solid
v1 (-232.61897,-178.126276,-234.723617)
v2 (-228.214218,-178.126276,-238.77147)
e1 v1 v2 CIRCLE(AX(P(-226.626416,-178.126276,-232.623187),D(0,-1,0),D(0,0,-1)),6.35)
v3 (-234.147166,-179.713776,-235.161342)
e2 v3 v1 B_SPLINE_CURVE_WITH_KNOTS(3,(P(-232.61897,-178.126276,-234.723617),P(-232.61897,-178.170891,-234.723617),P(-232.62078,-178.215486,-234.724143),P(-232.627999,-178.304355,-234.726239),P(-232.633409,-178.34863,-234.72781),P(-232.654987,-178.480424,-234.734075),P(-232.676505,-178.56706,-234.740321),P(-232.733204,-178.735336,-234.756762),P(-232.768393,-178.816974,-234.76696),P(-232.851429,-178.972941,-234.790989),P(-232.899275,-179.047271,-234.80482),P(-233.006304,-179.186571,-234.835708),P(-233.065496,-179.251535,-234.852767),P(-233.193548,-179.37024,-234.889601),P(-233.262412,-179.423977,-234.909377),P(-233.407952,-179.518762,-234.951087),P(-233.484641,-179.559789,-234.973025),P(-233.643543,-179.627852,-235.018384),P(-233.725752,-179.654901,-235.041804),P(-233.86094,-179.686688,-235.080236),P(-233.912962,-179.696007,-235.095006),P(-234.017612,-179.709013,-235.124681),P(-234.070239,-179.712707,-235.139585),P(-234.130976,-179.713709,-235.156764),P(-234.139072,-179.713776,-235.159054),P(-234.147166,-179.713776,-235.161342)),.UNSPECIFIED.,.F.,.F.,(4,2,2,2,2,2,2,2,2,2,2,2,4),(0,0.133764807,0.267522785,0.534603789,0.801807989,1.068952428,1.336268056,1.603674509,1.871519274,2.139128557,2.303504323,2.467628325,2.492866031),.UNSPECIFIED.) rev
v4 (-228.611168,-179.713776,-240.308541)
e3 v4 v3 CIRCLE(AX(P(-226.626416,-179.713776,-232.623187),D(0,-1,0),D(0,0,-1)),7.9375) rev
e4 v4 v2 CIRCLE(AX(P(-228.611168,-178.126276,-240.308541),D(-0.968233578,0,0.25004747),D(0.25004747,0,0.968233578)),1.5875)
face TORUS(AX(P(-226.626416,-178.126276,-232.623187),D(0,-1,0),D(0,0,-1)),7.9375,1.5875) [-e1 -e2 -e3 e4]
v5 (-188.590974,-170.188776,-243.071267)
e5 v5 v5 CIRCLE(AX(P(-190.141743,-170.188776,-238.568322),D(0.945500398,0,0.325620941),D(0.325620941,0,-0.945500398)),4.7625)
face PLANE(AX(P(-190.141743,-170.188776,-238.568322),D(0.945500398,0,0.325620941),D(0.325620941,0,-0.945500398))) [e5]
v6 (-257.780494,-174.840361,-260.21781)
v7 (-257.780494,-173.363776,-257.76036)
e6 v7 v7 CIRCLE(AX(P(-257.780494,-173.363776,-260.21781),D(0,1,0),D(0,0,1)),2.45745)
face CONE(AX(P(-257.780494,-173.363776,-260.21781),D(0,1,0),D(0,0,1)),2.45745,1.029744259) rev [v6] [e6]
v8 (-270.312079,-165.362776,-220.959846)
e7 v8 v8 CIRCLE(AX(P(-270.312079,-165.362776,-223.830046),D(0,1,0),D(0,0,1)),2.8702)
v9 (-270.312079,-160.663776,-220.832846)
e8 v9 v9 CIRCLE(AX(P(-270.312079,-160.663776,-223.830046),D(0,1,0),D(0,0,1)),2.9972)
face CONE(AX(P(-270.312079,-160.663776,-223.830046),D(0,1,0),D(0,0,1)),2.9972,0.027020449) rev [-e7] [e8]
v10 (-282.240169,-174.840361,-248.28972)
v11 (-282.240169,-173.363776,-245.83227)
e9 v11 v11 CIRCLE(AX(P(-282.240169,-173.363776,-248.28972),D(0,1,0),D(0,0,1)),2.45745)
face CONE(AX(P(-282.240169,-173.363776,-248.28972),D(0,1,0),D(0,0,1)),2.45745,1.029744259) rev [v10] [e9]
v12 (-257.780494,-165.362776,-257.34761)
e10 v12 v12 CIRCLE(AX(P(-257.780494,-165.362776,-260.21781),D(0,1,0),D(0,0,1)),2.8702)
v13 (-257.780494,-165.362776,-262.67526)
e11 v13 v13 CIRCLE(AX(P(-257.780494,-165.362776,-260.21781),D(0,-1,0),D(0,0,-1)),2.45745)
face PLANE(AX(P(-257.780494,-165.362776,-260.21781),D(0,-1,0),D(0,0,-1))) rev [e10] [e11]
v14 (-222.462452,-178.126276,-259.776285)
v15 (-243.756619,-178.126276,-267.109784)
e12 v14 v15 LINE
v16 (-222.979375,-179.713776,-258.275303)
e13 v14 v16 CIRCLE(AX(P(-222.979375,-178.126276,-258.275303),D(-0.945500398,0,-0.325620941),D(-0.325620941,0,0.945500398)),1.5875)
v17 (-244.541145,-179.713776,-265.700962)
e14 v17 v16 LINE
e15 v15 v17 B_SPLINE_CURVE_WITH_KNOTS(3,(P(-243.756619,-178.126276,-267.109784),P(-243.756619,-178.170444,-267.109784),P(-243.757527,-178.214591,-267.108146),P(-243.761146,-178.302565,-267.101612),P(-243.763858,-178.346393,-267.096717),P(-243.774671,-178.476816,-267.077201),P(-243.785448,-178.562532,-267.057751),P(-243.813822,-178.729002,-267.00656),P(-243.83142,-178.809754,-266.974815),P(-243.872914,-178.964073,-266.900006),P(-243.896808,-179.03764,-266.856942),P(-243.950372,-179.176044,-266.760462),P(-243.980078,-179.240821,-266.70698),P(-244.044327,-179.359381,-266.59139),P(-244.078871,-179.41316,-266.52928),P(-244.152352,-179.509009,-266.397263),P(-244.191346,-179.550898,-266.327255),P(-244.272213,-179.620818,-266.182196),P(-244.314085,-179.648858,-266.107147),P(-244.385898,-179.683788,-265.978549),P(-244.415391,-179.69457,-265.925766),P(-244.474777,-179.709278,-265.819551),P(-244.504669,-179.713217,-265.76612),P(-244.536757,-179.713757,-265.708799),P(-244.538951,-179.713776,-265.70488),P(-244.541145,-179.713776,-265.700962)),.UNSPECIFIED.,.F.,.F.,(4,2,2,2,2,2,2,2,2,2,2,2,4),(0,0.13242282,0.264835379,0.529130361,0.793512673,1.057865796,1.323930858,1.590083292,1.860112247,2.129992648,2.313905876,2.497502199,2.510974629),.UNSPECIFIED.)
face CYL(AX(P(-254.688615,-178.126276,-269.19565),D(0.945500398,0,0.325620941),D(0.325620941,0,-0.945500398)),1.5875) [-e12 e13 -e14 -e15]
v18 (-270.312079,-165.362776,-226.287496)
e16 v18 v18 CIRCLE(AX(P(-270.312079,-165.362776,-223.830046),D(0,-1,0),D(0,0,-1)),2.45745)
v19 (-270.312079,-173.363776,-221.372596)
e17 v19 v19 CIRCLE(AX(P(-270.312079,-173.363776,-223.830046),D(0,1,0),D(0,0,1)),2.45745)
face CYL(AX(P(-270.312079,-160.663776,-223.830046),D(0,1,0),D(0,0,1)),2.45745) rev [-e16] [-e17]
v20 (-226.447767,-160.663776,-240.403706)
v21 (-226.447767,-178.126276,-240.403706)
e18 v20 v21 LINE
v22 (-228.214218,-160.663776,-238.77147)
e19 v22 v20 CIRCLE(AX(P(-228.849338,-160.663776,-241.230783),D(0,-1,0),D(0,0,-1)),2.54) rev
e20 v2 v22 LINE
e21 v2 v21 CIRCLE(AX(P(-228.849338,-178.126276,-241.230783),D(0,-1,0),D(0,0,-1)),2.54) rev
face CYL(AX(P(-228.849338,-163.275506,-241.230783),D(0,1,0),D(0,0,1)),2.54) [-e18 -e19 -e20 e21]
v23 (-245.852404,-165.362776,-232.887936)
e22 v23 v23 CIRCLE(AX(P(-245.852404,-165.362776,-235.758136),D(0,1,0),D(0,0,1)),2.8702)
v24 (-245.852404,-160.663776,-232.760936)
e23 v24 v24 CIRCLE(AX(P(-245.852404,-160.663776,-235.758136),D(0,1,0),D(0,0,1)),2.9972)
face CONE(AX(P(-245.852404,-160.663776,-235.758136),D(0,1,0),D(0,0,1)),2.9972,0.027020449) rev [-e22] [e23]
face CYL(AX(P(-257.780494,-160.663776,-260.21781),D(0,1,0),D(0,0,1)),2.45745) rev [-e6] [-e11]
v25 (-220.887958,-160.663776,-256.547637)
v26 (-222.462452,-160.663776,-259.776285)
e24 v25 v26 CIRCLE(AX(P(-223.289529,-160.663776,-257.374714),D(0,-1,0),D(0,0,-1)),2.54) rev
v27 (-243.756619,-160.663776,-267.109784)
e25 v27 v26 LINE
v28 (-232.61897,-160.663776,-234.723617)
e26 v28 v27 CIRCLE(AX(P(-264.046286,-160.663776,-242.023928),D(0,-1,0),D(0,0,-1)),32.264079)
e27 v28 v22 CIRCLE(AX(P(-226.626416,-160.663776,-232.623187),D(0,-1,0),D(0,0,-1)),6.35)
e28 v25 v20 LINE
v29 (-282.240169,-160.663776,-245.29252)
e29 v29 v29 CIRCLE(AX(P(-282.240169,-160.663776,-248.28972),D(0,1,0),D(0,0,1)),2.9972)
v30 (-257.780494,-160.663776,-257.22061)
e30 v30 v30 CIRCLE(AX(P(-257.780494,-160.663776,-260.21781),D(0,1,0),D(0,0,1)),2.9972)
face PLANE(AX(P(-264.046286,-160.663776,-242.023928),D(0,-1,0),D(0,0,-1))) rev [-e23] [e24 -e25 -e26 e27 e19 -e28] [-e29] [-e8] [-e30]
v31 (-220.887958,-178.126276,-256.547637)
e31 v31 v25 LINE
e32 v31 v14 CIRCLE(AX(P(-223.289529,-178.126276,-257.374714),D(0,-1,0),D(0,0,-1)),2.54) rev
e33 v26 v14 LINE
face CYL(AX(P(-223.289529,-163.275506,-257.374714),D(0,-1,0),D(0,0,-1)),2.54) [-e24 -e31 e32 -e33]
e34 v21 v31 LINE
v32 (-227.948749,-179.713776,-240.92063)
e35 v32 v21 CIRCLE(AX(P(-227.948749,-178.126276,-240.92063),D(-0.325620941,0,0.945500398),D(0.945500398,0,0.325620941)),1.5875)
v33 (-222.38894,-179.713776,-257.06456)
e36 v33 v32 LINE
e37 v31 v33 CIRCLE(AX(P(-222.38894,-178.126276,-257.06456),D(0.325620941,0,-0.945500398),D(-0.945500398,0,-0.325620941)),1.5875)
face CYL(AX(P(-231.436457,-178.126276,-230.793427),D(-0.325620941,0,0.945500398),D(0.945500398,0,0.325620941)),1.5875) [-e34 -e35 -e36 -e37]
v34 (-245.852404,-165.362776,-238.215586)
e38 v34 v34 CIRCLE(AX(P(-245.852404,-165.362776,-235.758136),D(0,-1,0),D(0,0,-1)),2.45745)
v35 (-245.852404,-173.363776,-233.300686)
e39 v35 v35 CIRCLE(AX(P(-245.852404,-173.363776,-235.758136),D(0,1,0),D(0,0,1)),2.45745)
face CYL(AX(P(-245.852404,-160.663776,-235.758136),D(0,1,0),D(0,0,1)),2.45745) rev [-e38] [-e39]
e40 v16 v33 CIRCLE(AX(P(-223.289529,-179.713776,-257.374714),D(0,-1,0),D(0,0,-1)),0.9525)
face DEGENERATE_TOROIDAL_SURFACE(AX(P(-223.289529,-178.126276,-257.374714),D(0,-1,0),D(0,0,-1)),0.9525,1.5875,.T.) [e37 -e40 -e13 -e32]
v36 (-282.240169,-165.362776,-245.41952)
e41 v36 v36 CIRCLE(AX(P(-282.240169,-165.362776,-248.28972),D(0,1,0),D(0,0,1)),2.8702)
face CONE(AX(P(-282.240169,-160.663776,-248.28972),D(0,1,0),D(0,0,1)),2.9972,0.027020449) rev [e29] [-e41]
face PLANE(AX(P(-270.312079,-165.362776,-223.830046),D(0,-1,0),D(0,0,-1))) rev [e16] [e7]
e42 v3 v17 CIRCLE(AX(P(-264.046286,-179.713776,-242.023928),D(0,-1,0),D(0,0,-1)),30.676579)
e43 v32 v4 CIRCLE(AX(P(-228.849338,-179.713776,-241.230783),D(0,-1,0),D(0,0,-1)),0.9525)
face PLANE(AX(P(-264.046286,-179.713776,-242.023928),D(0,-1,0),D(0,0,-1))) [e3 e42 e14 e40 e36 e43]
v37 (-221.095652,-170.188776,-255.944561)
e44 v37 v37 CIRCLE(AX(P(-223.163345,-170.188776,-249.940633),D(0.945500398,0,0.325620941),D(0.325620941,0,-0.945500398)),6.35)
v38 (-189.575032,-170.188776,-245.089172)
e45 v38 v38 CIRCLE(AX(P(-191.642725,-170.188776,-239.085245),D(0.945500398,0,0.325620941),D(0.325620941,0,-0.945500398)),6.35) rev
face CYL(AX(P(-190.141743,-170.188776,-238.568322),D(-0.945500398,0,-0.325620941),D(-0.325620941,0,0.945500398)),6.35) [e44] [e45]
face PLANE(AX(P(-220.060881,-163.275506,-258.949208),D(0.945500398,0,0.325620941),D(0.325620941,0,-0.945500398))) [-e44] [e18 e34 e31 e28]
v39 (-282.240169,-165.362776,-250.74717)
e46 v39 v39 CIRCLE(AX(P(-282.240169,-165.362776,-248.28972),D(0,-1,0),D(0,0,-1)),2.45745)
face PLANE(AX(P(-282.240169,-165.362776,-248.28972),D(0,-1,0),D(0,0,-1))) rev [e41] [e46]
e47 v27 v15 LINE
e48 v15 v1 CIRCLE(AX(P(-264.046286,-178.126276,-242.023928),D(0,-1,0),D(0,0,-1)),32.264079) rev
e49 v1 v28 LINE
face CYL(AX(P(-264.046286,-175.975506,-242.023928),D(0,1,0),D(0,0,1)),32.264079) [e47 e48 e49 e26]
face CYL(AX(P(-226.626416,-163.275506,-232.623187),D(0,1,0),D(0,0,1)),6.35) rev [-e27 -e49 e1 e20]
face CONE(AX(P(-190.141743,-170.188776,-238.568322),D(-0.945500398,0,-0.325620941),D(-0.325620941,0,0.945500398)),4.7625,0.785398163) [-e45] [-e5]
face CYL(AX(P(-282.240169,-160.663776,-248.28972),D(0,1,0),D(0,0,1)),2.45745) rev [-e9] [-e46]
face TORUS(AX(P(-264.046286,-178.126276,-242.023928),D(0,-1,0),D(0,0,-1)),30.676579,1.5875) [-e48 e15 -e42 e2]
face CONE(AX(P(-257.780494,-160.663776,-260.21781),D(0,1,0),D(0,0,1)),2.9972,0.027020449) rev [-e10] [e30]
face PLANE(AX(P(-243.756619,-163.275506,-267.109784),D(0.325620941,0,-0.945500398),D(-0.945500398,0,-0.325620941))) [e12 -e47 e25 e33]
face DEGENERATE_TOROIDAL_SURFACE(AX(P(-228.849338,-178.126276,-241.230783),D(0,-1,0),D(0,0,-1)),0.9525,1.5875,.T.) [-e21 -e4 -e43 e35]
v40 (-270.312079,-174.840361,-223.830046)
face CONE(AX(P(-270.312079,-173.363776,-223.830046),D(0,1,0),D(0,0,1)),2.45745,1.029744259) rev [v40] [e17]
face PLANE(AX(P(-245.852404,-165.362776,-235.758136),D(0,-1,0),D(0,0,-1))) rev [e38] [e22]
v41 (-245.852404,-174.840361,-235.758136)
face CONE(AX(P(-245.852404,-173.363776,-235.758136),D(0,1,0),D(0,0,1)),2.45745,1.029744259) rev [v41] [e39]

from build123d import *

# Parameters (mm, degrees)
STOCK_REFERENCE_START            = -175.975505736
STOCK_REFERENCE_SEAT_1_OUTLINE_R = 32.264078684
STOCK_REFERENCE_SEAT_1_DEPTH     = 15.311729992
STOCK_REFERENCE_SEAT_1_2_DEPTH   = 12.7
BOSS_EXTRUDE3_START              = 3.738270008
BOSS_EXTRUDE3_DEPTH              = 3.738270008
BOSS_EXTRUDE1_DEPTH              = 2.611729992
SKETCH2_R                        = 6.35
BOSS_EXTRUDE2_DEPTH              = 34.925
CHAMFER1_SIZE                    = 1.5875
FILLET1_R                        = 6.35
FILLET2_R                        = 2.54
FILLET3_R                        = 1.5875
HOLE1_AT_2_COUNT                 = 2
HOLE1_AT_2_PITCH                 = 27.213140303
HOLE1_AT_3_COUNT                 = 2
HOLE1_AT_3_PITCH                 = 38.485192091
HOLE1_AT_4_COUNT                 = 2
HOLE1_AT_4_PITCH                 = 27.213140303
F_8_CLEARANCE_HOLE1_D            = 4.9149
F_8_CLEARANCE_HOLE1_DEPTH        = 12.7
F_8_CLEARANCE_HOLE1_TIP          = 1.476584928


# Read off the part's stored shape, not the designer's step: Stock-Reference Seat-1
with BuildPart() as part:
    # Stock-Reference Seat-1 outline → Stock-Reference Seat-1 (new body)
    with BuildSketch(Plane(origin=(0, 0, 0), x_dir=(1, 0, 0), z_dir=(0, 1, 0)).offset(STOCK_REFERENCE_START)):
        with Locations((-264.046286299, 242.023928087)):
            Circle(STOCK_REFERENCE_SEAT_1_OUTLINE_R)
    extrude(amount=STOCK_REFERENCE_SEAT_1_DEPTH)

    # Stock-Reference Seat-1 2 outline → Stock-Reference Seat-1 2 (add)
    with BuildSketch(Plane(origin=(0, 0, 0), x_dir=(1, 0, 0), z_dir=(0, 1, 0)).offset(STOCK_REFERENCE_START)):
        with BuildLine():
            ThreePointArc((-243.756619182, 267.109784294), (-233.536149053, 252.516892329), (-232.618762484, 234.724508918))
            Line((-232.618762484, 234.724508918), (-230.711355396, 240.263016846))
            Line((-230.711355396, 240.263016846), (-226.943146121, 238.965283021))
            Line((-226.943146121, 238.965283021), (-220.060881103, 258.949207593))
            Line((-220.060881103, 258.949207593), (-243.756619182, 267.109784294))
        make_face()
    extrude(amount=STOCK_REFERENCE_SEAT_1_2_DEPTH)

    # Sketch7 → Boss-Extrude3 (add)
    with BuildSketch(Plane.XZ.offset(175.975505736).offset(BOSS_EXTRUDE3_START)):
        with BuildLine():
            Line((-243.756619182, -267.109784294), (-220.060881103, -258.949207593))
            Line((-220.060881103, -258.949207593), (-226.943146121, -238.965283021))
            Line((-226.943146121, -238.965283021), (-230.711355396, -240.263016846))
            Line((-230.711355396, -240.263016846), (-232.618762484, -234.724508918))
            ThreePointArc((-232.618762484, -234.724508918), (-294.556423545, -231.530963846), (-243.756619182, -267.109784294))
        make_face()
    extrude(amount=-BOSS_EXTRUDE3_DEPTH)

    # Sketch1 → Boss-Extrude1 (add)
    with BuildSketch(Plane(origin=(0, -163.275505736, 0), x_dir=(1, 0, 0), z_dir=(0, 1, 0))):
        with BuildLine():
            Line((-232.618762484, 234.724508918), (-230.711355396, 240.263016846))
            Line((-230.711355396, 240.263016846), (-226.943146121, 238.965283021))
            Line((-226.943146121, 238.965283021), (-220.060881103, 258.949207593))
            Line((-220.060881103, 258.949207593), (-243.756619182, 267.109784294))
            ThreePointArc((-243.756619182, 267.109784294), (-233.536149053, 252.516892329), (-232.618762484, 234.724508918))
        make_face()
    extrude(amount=BOSS_EXTRUDE1_DEPTH)

    # Sketch2 → Boss-Extrude2 (add)
    with BuildSketch(Plane(origin=(-276.451963722, 0, -95.207308867), x_dir=(0.325620940566074, 0, -0.9455003982362278), z_dir=(0.9455003982362278, 0, 0.32562094056607405))):
        with Locations((163.652309847, -170.188775744)):
            Circle(SKETCH2_R)
    extrude(amount=BOSS_EXTRUDE2_DEPTH)

    # Chamfer1
    chamfer1_edges = [part.edges().sort_by_distance(p)[0] for p in [
        (-192.209436228, -170.188775744, -232.564394121),
    ]]
    chamfer(chamfer1_edges, length=CHAMFER1_SIZE)

    # Fillet1
    # the kernel refuses this fillet: 6.35 mm, written as the material it adds along each edge
    with BuildSketch(Plane(origin=(-230.711355396, -175.975505736, -240.263016846), x_dir=(0.9455003982389363, 0, 0.3256209405582093), z_dir=(0, 1, 0))) as fillet1_piece_1:
        with BuildLine():
            CenterArc((6.349999999, -5.893320524), FILLET1_R, 111.862223466, 68.137776529)
            Line((-1e-09, -5.893320524), (-0.127000001, -5.893320524))
            Line((-0.127000001, -5.893320524), (-0.127, 0))
            Line((-0.127, 0), (0, 0.127))
            ThreePointArc((0, 0.127), (1.992706339, 0.127), (3.938120932, 0.11786641))
            Line((3.938120932, 0.11786641), (3.985412679, 0))
        make_face()
    extrude(amount=12.7)
    with BuildSketch(Plane(origin=(-230.711355396, -179.713775744, -240.263016846), x_dir=(0.9455003982362268, 0, 0.3256209405660767), z_dir=(0, 1, 0))) as fillet1_piece_2:
        with BuildLine():
            CenterArc((6.35, -5.893320524), FILLET1_R, 111.862223465, 68.137776535)
            Line((0, -5.893320524), (-0.127, -5.893320524))
            Line((-0.127, -5.893320524), (-0.127, 0))
            Line((-0.127, 0), (0, 0.127))
            ThreePointArc((0, 0.127), (1.99270634, 0.127), (3.938120933, 0.11786641))
            Line((3.938120933, 0.11786641), (3.98541268, 0))
        make_face()
    extrude(amount=3.738270008)
    with BuildSketch(Plane(origin=(-230.711355396, -163.275505736, -240.263016846), x_dir=(0.9455003982362268, 0, 0.3256209405660767), z_dir=(0, 1, 0))) as fillet1_piece_3:
        with BuildLine():
            CenterArc((6.35, -5.893320524), FILLET1_R, 111.862223465, 68.137776535)
            Line((0, -5.893320524), (-0.127, -5.893320524))
            Line((-0.127, -5.893320524), (-0.127, 0))
            Line((-0.127, 0), (0, 0.127))
            ThreePointArc((0, 0.127), (1.99270634, 0.127), (3.938120933, 0.11786641))
            Line((3.938120933, 0.11786641), (3.98541268, 0))
        make_face()
    extrude(amount=2.611729992)

    # Fillet2
    fillet2_edges = [part.edges().sort_by_distance(p)[0] for p in [
        (-226.943146121, -169.625505736, -238.965283021),
        (-220.060881103, -169.625505736, -258.949207593),
    ]]
    fillet(fillet2_edges, radius=FILLET2_R)

    # Fillet3
    fillet3_edges = [part.edges().sort_by_distance(p)[0] for p in [
        (-233.109535648, -179.713775744, -263.443034538),
        (-294.55657248, -179.713775744, -231.531396911),
        (-223.667862866, -179.713775744, -248.475671438),
        (-230.923127248, -179.713775744, -237.298737872),
        (-227.125556964, -179.713775744, -239.36526013),
        (-221.006530266, -179.713775744, -258.488049029),
    ]]
    fillet(fillet3_edges, radius=FILLET3_R)

    # Sketch4 → Hole1 (revolve, cut)
    with BuildSketch(Plane(origin=(-245.852404075, -160.663775744, -235.758135864), x_dir=(0, 0, 1), z_dir=(1, 0, 0))):
        Polygon((0, 0), (0, 4.699), (2.8702, 4.699), (2.9972, 0), align=None)
    hole1 = revolve(axis=Axis((-245.852404075, -270.663775744, -235.758135864), (0, 1, 0)), mode=Mode.SUBTRACT)

    # Hole1 at 2: Hole1 ×2
    with Locations(*[Vector(-0.8988185183780313, 0, 0.43832096803680365) * (i * HOLE1_AT_2_PITCH) for i in range(1, HOLE1_AT_2_COUNT)]):
        add(hole1, mode=Mode.SUBTRACT)

    # Hole1 at 3: Hole1 ×2
    with Locations(*[Vector(-0.945500398236235, 0, -0.3256209405660531) * (i * HOLE1_AT_3_PITCH) for i in range(1, HOLE1_AT_3_COUNT)]):
        add(hole1, mode=Mode.SUBTRACT)

    # Hole1 at 4: Hole1 ×2
    with Locations(*[Vector(-0.4383209680367791, 0, -0.8988185183780433) * (i * HOLE1_AT_4_PITCH) for i in range(1, HOLE1_AT_4_COUNT)]):
        add(hole1, mode=Mode.SUBTRACT)

    # #8 Clearance Hole1
    with Locations(Plane(origin=(0, -160.663775744, 0), x_dir=(1, 0, 0), z_dir=(0, 1, 0))):
        with Locations((-245.852404075, 235.758135864), (-270.312078522, 223.830045863), (-282.240168523, 248.289720311), (-257.780494076, 260.217810311)):
            Hole(F_8_CLEARANCE_HOLE1_D / 2, depth=F_8_CLEARANCE_HOLE1_DEPTH)
            with Locations((0, 0, -(F_8_CLEARANCE_HOLE1_DEPTH + F_8_CLEARANCE_HOLE1_TIP / 2))):  # 118° drill point
                Cone(0, F_8_CLEARANCE_HOLE1_D / 2, F_8_CLEARANCE_HOLE1_TIP, mode=Mode.SUBTRACT)


solid = part.part
